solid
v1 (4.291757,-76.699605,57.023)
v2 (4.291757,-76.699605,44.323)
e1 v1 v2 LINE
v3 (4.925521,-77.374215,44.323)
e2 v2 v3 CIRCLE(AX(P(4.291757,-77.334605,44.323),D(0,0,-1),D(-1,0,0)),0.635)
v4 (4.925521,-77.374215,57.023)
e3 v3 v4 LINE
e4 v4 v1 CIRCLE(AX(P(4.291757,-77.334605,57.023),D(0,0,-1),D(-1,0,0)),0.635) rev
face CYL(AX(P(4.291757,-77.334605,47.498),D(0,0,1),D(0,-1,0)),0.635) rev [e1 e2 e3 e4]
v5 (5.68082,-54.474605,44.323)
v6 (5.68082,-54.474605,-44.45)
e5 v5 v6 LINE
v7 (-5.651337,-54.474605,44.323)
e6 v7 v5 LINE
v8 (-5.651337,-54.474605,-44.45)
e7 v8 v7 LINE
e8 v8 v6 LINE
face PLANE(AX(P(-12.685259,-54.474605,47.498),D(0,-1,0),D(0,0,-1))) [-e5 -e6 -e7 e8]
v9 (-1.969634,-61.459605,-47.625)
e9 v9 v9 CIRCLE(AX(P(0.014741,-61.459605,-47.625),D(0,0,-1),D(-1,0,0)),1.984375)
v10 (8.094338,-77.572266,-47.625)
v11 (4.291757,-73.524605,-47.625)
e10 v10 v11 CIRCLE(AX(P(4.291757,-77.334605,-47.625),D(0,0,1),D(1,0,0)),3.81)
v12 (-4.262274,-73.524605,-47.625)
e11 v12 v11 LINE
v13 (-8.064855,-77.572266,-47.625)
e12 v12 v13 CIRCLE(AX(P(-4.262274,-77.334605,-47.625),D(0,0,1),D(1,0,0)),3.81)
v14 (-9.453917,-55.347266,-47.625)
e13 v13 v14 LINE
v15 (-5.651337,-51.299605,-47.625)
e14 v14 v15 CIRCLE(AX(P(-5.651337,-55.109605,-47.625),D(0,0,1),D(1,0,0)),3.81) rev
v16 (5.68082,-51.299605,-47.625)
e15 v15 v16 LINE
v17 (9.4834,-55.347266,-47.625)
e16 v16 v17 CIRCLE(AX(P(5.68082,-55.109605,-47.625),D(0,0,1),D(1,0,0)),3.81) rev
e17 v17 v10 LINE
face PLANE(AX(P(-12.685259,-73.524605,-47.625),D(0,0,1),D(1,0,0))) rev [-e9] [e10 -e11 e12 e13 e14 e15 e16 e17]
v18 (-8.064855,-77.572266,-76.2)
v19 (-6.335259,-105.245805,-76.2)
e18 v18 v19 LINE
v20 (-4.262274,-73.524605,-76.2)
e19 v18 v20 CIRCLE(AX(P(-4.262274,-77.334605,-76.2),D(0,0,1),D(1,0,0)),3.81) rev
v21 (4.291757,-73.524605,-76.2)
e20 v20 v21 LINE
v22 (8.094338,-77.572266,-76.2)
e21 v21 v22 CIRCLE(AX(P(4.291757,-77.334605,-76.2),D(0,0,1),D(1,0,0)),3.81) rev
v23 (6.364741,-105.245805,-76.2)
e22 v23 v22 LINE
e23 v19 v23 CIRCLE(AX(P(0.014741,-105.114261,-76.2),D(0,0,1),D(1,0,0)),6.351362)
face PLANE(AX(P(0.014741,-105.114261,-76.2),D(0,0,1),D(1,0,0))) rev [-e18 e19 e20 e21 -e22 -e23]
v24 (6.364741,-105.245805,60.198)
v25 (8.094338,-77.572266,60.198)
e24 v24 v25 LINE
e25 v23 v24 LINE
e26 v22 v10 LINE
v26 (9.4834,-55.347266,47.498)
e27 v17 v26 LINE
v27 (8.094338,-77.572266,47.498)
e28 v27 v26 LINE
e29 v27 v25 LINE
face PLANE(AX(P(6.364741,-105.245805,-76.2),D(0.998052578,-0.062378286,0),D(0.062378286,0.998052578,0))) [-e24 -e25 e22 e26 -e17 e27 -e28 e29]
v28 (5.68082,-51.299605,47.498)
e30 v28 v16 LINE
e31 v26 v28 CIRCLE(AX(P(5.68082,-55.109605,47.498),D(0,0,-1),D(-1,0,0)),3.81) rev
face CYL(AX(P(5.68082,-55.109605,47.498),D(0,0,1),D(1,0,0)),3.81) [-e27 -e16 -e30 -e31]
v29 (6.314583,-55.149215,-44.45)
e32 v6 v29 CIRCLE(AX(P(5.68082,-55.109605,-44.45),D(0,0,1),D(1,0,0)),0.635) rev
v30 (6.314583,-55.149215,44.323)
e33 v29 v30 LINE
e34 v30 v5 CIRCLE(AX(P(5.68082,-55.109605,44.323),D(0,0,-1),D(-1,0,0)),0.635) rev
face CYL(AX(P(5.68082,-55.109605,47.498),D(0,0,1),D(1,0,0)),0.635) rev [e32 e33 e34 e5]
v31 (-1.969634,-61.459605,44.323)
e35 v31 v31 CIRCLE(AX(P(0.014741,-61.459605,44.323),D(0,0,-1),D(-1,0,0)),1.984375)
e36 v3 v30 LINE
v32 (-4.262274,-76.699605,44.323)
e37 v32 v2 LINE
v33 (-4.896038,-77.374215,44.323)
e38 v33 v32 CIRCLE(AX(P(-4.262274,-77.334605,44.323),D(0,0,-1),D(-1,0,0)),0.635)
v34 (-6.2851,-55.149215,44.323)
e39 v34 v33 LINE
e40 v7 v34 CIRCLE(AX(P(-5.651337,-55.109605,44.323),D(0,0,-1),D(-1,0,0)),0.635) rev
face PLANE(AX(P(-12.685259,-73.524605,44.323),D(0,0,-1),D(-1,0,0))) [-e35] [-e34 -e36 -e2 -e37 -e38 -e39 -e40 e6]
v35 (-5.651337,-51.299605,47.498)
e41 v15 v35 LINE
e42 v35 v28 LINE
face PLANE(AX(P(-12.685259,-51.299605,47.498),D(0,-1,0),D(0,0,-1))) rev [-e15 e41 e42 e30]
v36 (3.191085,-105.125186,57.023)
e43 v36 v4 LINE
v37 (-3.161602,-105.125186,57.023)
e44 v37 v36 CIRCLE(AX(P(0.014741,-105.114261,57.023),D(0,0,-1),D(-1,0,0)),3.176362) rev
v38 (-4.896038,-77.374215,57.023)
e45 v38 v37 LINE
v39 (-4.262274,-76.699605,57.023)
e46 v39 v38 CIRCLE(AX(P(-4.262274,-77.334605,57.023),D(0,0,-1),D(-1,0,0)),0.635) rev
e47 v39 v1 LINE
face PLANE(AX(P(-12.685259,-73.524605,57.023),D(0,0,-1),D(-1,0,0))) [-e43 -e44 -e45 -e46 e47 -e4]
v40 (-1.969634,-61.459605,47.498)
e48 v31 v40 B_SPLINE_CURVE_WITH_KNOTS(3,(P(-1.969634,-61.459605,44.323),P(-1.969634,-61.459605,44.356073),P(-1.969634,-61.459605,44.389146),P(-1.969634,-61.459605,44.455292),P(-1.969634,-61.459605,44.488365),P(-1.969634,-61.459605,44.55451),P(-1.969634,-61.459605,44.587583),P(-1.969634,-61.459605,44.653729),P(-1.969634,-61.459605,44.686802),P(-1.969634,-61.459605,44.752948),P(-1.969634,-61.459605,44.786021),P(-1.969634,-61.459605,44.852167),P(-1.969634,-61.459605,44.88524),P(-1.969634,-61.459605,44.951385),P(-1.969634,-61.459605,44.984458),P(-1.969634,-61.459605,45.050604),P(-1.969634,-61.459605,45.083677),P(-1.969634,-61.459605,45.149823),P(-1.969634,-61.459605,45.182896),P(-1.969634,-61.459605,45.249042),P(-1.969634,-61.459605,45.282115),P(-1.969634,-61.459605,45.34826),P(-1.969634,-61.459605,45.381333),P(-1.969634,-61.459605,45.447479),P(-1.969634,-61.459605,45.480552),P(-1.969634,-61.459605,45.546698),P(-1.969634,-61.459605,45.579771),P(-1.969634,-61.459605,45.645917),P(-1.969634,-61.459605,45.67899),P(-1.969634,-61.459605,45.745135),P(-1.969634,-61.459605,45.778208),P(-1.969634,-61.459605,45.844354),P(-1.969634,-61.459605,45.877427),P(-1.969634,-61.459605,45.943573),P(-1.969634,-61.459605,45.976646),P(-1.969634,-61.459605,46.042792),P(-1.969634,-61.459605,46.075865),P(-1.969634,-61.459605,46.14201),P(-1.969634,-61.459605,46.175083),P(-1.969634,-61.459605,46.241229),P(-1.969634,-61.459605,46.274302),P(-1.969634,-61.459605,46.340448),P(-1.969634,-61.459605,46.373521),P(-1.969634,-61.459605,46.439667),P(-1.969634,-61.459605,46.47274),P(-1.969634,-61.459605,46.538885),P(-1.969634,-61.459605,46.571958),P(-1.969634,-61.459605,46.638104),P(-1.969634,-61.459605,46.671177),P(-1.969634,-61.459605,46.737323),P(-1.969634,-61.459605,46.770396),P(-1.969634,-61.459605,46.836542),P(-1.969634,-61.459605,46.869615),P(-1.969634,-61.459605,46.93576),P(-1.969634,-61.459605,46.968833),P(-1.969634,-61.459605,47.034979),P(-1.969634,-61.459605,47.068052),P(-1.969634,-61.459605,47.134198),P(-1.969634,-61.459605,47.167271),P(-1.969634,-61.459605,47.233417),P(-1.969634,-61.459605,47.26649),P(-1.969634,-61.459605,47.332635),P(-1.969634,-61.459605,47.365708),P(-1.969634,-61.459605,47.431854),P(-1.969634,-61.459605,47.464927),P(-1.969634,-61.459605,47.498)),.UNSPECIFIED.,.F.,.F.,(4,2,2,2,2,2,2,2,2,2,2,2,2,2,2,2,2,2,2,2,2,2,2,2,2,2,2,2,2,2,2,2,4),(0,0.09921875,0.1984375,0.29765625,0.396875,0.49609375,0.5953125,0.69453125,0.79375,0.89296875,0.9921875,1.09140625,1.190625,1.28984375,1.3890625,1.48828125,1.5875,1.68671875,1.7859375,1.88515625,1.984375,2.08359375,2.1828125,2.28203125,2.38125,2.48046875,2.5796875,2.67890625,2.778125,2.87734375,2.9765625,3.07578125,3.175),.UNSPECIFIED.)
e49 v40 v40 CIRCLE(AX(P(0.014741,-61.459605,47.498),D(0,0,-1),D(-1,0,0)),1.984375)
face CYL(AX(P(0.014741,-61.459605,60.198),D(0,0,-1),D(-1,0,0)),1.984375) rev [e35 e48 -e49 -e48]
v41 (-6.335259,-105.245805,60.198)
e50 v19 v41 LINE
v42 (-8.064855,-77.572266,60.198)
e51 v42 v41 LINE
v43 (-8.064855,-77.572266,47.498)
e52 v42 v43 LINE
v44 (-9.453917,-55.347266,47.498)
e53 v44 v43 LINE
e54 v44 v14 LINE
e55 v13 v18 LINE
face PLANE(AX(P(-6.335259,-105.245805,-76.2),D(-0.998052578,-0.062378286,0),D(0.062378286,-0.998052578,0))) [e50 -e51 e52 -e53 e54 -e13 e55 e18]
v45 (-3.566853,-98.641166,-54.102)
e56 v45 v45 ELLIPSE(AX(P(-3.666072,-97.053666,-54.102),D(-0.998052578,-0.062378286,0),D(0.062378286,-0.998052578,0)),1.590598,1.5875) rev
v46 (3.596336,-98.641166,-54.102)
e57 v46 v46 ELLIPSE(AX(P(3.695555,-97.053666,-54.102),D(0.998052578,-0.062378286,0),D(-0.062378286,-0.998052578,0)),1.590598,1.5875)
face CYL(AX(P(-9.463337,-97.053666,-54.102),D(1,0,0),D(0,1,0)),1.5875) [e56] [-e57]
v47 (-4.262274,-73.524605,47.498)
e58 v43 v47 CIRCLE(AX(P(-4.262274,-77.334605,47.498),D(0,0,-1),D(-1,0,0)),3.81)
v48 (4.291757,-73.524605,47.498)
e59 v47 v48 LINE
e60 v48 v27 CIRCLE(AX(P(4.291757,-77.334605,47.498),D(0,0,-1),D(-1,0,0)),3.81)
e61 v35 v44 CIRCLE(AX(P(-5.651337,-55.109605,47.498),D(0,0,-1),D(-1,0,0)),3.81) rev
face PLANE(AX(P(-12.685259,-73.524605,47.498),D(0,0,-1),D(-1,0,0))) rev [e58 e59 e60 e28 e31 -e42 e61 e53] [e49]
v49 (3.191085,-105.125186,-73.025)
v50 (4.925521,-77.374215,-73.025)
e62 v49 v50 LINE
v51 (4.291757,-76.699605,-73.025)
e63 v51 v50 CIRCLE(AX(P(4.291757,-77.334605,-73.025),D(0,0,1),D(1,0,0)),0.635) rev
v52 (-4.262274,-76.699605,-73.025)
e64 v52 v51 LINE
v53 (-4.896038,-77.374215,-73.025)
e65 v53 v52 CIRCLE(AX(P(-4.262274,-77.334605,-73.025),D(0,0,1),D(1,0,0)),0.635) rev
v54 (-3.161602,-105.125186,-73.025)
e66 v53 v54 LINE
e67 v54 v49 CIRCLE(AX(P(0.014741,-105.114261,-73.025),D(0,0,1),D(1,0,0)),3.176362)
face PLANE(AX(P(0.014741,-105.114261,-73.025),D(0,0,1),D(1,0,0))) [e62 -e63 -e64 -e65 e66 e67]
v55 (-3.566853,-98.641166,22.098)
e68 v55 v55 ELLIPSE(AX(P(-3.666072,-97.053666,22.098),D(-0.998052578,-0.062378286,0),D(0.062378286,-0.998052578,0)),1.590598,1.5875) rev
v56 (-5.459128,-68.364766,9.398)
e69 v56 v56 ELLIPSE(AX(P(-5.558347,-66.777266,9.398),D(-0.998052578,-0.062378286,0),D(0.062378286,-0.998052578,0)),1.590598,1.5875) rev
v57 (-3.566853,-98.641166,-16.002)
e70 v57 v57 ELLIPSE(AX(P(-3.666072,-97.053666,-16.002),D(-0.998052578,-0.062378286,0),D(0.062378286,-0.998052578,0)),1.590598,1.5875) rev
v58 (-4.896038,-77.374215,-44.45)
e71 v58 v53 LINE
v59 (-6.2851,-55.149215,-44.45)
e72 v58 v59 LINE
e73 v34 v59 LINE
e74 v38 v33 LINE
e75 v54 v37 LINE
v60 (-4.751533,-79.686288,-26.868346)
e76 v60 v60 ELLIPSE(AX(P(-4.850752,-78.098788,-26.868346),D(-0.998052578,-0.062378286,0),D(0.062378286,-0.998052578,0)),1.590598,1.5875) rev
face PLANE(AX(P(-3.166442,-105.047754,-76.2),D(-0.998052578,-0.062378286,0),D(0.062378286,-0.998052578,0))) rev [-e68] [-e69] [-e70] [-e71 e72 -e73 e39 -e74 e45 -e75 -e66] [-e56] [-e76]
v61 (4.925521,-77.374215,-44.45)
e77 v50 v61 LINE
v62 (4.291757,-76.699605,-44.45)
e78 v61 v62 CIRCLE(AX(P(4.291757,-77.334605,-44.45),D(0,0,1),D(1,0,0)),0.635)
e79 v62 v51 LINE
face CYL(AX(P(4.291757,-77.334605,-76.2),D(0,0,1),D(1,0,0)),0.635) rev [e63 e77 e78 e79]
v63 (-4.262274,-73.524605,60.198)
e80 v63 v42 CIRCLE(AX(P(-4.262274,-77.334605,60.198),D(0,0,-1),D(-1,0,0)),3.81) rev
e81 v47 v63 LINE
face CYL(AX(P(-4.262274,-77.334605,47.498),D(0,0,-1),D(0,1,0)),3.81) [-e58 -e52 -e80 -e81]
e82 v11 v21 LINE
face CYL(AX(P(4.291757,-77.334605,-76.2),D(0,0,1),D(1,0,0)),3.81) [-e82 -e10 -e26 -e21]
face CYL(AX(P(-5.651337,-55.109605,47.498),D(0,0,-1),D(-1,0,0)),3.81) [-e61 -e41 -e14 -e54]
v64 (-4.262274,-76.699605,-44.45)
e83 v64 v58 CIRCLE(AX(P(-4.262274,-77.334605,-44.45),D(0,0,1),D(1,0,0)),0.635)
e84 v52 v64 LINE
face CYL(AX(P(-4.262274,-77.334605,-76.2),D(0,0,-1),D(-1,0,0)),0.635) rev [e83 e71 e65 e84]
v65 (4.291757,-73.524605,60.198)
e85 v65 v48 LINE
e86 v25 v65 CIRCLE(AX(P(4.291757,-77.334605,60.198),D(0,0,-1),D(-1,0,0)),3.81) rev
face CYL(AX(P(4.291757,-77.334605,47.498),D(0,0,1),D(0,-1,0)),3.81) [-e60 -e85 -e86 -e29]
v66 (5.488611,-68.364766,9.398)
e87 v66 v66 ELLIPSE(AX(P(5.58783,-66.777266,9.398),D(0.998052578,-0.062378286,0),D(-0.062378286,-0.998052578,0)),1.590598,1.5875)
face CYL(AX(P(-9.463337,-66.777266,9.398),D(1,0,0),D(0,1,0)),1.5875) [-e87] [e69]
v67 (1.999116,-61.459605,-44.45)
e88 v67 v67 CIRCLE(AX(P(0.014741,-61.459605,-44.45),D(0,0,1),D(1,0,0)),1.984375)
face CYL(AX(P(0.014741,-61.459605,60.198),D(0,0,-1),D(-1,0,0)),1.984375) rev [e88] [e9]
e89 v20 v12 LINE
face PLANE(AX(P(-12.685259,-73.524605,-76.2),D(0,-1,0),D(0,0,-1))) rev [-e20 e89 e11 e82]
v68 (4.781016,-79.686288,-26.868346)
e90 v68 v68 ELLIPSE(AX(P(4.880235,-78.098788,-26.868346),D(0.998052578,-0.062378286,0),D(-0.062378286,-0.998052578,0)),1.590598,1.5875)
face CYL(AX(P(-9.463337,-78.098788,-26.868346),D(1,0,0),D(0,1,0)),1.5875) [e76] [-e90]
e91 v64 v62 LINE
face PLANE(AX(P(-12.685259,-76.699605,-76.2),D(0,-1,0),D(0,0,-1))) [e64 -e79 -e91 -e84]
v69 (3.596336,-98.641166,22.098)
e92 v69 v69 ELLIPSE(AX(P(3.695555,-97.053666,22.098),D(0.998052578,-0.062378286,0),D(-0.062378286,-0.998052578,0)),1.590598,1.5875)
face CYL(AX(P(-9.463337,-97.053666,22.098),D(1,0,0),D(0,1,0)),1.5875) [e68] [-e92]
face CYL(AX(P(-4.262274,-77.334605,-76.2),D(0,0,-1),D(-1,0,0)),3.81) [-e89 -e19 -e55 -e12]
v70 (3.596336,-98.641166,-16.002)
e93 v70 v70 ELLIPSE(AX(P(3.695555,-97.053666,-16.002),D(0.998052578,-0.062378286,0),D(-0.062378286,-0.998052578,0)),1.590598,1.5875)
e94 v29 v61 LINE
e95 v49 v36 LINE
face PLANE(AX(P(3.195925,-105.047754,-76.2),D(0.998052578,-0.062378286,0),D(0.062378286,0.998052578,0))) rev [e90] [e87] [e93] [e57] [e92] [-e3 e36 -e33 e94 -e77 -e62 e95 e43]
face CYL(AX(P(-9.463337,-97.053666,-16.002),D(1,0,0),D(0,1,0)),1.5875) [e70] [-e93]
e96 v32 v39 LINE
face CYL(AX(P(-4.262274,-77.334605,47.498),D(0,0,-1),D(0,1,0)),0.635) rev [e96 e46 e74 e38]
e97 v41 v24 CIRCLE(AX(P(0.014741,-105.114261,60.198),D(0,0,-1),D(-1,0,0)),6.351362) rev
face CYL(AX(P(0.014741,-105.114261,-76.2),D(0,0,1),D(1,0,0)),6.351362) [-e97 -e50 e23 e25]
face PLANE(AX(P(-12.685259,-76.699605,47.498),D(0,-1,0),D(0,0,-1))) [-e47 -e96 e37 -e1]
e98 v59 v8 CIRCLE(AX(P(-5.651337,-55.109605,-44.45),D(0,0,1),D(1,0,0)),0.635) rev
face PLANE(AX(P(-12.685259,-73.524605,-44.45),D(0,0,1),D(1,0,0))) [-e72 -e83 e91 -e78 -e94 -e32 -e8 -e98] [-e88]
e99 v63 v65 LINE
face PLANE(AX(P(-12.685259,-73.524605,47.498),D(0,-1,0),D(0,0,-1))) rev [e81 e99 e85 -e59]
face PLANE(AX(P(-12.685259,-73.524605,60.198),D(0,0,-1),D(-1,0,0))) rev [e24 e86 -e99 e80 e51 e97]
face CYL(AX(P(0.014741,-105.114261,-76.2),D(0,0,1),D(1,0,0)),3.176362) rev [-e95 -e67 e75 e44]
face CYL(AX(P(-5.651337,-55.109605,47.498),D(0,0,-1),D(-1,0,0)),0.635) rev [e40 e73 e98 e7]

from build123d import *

# Parameters (mm, degrees)
BOSS_EXTRUDE1_DEPTH             = 76.2
BOSS_EXTRUDE1_DEPTH_BACK        = 76.2
CUT_EXTRUDE1_DEPTH              = 136.619651209
CUT_EXTRUDE1_DEPTH_BACK         = 136.619651209
FILLET1_R                       = 3.81
SHELL1_START                    = -44.45
SHELL1_DEPTH                    = 88.773
SHELL1_START_2                  = -73.025
SHELL1_2_DEPTH                  = 130.048
SKETCH14_R                      = 1.984375
CUT_EXTRUDE8_DEPTH              = 156.372005628
BOSS_EXTRUDE4_REACH             = 137.201
SKETCH15_R                      = 1.5875
BOSS_EXTRUDE4_DIRECTION_2_REACH = 137.201


# Read off the part's stored shape, not the designer's step: Shell1
with BuildPart() as part:
    # Sketch1 → Boss-Extrude1 (new, two sides: drawn at the far end of the back side and taken through both)
    with BuildSketch(Plane.XY.offset(-BOSS_EXTRUDE1_DEPTH_BACK)):
        with BuildLine():
            Line((-6.335258536, -105.245804705), (-12.685258536, -3.645804705))
            ThreePointArc((-12.685258536, -3.645804705), (0.014741464, 8.866413132), (12.714741464, -3.645804705))
            Line((12.714741464, -3.645804705), (6.364741464, -105.245804705))
            ThreePointArc((6.364741464, -105.245804705), (0.014741464, -111.465623147), (-6.335258536, -105.245804705))
        make_face()
    extrude(amount=BOSS_EXTRUDE1_DEPTH + BOSS_EXTRUDE1_DEPTH_BACK)

    # Sketch4 → Cut-Extrude1 (cut, two sides: drawn at the far end of the back side and taken through both)
    with BuildSketch(Plane(origin=(0, 0, 0), x_dir=(0, 0, -1), z_dir=(1, 0, 0)).offset(-CUT_EXTRUDE1_DEPTH_BACK)):
        Polygon((-47.498, -73.524605007), (-47.498, -51.299605007), (47.625, -51.299605007), (47.625, -73.524605007), (76.2, -73.524605007), (76.2, 8.866413132), (-76.2, 8.866413132), (-76.2, -28.682279346), (-76.2, -111.465623147), (-60.198, -111.465623147), (-60.198, -73.524605007), align=None)
    extrude(amount=CUT_EXTRUDE1_DEPTH + CUT_EXTRUDE1_DEPTH_BACK, mode=Mode.SUBTRACT)

    # Fillet1
    fillet1_edges = [part.edges().sort_by_distance(p)[0] for p in [
        (8.347316445, -73.524605007, 53.848),
        (9.736378945, -51.299605007, -0.0635),
        (-9.706896017, -51.299605007, -0.0635),
        (-8.317833517, -73.524605007, 53.848),
        (-8.317833517, -73.524605007, -61.9125),
        (8.347316445, -73.524605007, -61.9125),
    ]]
    fillet(fillet1_edges, radius=FILLET1_R)

    # Shell1 outline → Shell1 (cut)
    with BuildSketch(Plane.XY.offset(SHELL1_START)):
        with BuildLine():
            ThreePointArc((-3.161602106, -105.125185529), (0.014741465, -108.290623147), (3.191085035, -105.125185529))
            Line((3.191085035, -105.125185529), (6.314583179, -55.149215219))
            ThreePointArc((6.314583179, -55.149215219), (6.143625088, -54.674822007), (5.680819792, -54.474605007))
            Line((5.680819792, -54.474605007), (-5.651336863, -54.474605007))
            ThreePointArc((-5.651336863, -54.474605007), (-6.114142159, -54.674822006), (-6.285100251, -55.149215219))
            Line((-6.285100251, -55.149215219), (-3.161602106, -105.125185529))
        make_face()
    extrude(amount=SHELL1_DEPTH, mode=Mode.SUBTRACT)

    # Shell1 2 outline → Shell1 2 (cut)
    with BuildSketch(Plane.XY.offset(SHELL1_START_2)):
        with BuildLine():
            Line((-4.896037751, -77.374215219), (-3.161602106, -105.125185529))
            ThreePointArc((-3.161602106, -105.125185529), (0.014741465, -108.290623147), (3.191085035, -105.125185529))
            Line((3.191085035, -105.125185529), (4.925520679, -77.374215219))
            ThreePointArc((4.925520679, -77.374215219), (4.754562588, -76.899822007), (4.291757292, -76.699605007))
            Line((4.291757292, -76.699605007), (-4.262274363, -76.699605007))
            ThreePointArc((-4.262274363, -76.699605007), (-4.725079659, -76.899822006), (-4.896037751, -77.374215219))
        make_face()
    extrude(amount=SHELL1_2_DEPTH, mode=Mode.SUBTRACT)

    # Sketch14 → Cut-Extrude8 (cut, through all)
    with BuildSketch(Plane(origin=(0, 0, -47.625), x_dir=(-1, 0, 0), z_dir=(0, 0, -1))):
        with Locations((-0.014741464, -61.459605007)):
            Circle(SKETCH14_R)
    extrude(amount=-CUT_EXTRUDE8_DEPTH, mode=Mode.SUBTRACT)

    # Boss-Extrude4: up to this plane
    boss_extrude4_end = Plane(origin=(3.195924528, -105.047753647, -76.2), z_dir=(0.9980525784828886, -0.062378286155180485, 0))
    # Sketch15 → Boss-Extrude4 (add, up to the surface)
    with BuildSketch(Plane(origin=(3.191103822, -0.502900096, 0), x_dir=(0, 0, -1), z_dir=(1, 0, 0)), mode=Mode.PRIVATE) as boss_extrude4_sk1:
        with Locations(Location((-9.398, -66.274366182, 0), (0, 0, 270))):
            Circle(SKETCH15_R)
    boss_extrude4_tool1 = split(extrude(boss_extrude4_sk1.sketch, amount=BOSS_EXTRUDE4_REACH, mode=Mode.PRIVATE), bisect_by=boss_extrude4_end, keep=Keep.BOTH, mode=Mode.PRIVATE)
    add(boss_extrude4_tool1.solids().sort_by_distance((3.191104, -66.777266, 9.398))[0])
    # Sketch15 → Boss-Extrude4 (add, up to the surface)
    with BuildSketch(Plane(origin=(3.191103822, -0.502900096, 0), x_dir=(0, 0, -1), z_dir=(1, 0, 0)), mode=Mode.PRIVATE) as boss_extrude4_sk2:
        with Locations(Location((26.868345804, -77.595887652, 0), (0, 0, 270))):
            Circle(SKETCH15_R)
    boss_extrude4_tool2 = split(extrude(boss_extrude4_sk2.sketch, amount=BOSS_EXTRUDE4_REACH, mode=Mode.PRIVATE), bisect_by=boss_extrude4_end, keep=Keep.BOTH, mode=Mode.PRIVATE)
    add(boss_extrude4_tool2.solids().sort_by_distance((3.191104, -78.098788, -26.868346))[0])
    # Sketch15 → Boss-Extrude4 (add, up to the surface)
    with BuildSketch(Plane(origin=(3.191103822, -0.502900096, 0), x_dir=(0, 0, -1), z_dir=(1, 0, 0)), mode=Mode.PRIVATE) as boss_extrude4_sk3:
        with Locations(Location((-22.098, -96.55076585, 0), (0, 0, 270))):
            Circle(SKETCH15_R)
    boss_extrude4_tool3 = split(extrude(boss_extrude4_sk3.sketch, amount=BOSS_EXTRUDE4_REACH, mode=Mode.PRIVATE), bisect_by=boss_extrude4_end, keep=Keep.BOTH, mode=Mode.PRIVATE)
    add(boss_extrude4_tool3.solids().sort_by_distance((3.191104, -97.053666, 22.098))[0])
    # Sketch15 → Boss-Extrude4 (add, up to the surface)
    with BuildSketch(Plane(origin=(3.191103822, -0.502900096, 0), x_dir=(0, 0, -1), z_dir=(1, 0, 0)), mode=Mode.PRIVATE) as boss_extrude4_sk4:
        with Locations(Location((16.002, -96.55076585, 0), (0, 0, 270))):
            Circle(SKETCH15_R)
    boss_extrude4_tool4 = split(extrude(boss_extrude4_sk4.sketch, amount=BOSS_EXTRUDE4_REACH, mode=Mode.PRIVATE), bisect_by=boss_extrude4_end, keep=Keep.BOTH, mode=Mode.PRIVATE)
    add(boss_extrude4_tool4.solids().sort_by_distance((3.191104, -97.053666, -16.002))[0])
    # Sketch15 → Boss-Extrude4 (add, up to the surface)
    with BuildSketch(Plane(origin=(3.191103822, -0.502900096, 0), x_dir=(0, 0, -1), z_dir=(1, 0, 0)), mode=Mode.PRIVATE) as boss_extrude4_sk5:
        with Locations(Location((54.102, -96.55076585, 0), (0, 0, 270))):
            Circle(SKETCH15_R)
    boss_extrude4_tool5 = split(extrude(boss_extrude4_sk5.sketch, amount=BOSS_EXTRUDE4_REACH, mode=Mode.PRIVATE), bisect_by=boss_extrude4_end, keep=Keep.BOTH, mode=Mode.PRIVATE)
    add(boss_extrude4_tool5.solids().sort_by_distance((3.191104, -97.053666, -54.102))[0])

    # Boss-Extrude4 direction 2: up to this plane
    boss_extrude4_direction_2_end = Plane(origin=(-3.166441599, -105.047753647, -76.2), z_dir=(-0.9980525784828886, -0.0623782861551806, 0))
    # Sketch15 → Boss-Extrude4 direction 2 (add, up to the surface)
    with BuildSketch(Plane(origin=(3.191103822, -0.502900096, 0), x_dir=(0, 0, -1), z_dir=(1, 0, 0)), mode=Mode.PRIVATE) as boss_extrude4_direction_2_sk1:
        with Locations(Location((-9.398, -66.274366182, 0), (0, 0, 270))):
            Circle(SKETCH15_R)
    boss_extrude4_direction_2_tool1 = split(extrude(boss_extrude4_direction_2_sk1.sketch, amount=-BOSS_EXTRUDE4_DIRECTION_2_REACH, mode=Mode.PRIVATE), bisect_by=boss_extrude4_direction_2_end, keep=Keep.BOTH, mode=Mode.PRIVATE)
    add(boss_extrude4_direction_2_tool1.solids().sort_by_distance((3.191104, -66.777266, 9.398))[0])
    # Sketch15 → Boss-Extrude4 direction 2 (add, up to the surface)
    with BuildSketch(Plane(origin=(3.191103822, -0.502900096, 0), x_dir=(0, 0, -1), z_dir=(1, 0, 0)), mode=Mode.PRIVATE) as boss_extrude4_direction_2_sk2:
        with Locations(Location((26.868345804, -77.595887652, 0), (0, 0, 270))):
            Circle(SKETCH15_R)
    boss_extrude4_direction_2_tool2 = split(extrude(boss_extrude4_direction_2_sk2.sketch, amount=-BOSS_EXTRUDE4_DIRECTION_2_REACH, mode=Mode.PRIVATE), bisect_by=boss_extrude4_direction_2_end, keep=Keep.BOTH, mode=Mode.PRIVATE)
    add(boss_extrude4_direction_2_tool2.solids().sort_by_distance((3.191104, -78.098788, -26.868346))[0])
    # Sketch15 → Boss-Extrude4 direction 2 (add, up to the surface)
    with BuildSketch(Plane(origin=(3.191103822, -0.502900096, 0), x_dir=(0, 0, -1), z_dir=(1, 0, 0)), mode=Mode.PRIVATE) as boss_extrude4_direction_2_sk3:
        with Locations(Location((-22.098, -96.55076585, 0), (0, 0, 270))):
            Circle(SKETCH15_R)
    boss_extrude4_direction_2_tool3 = split(extrude(boss_extrude4_direction_2_sk3.sketch, amount=-BOSS_EXTRUDE4_DIRECTION_2_REACH, mode=Mode.PRIVATE), bisect_by=boss_extrude4_direction_2_end, keep=Keep.BOTH, mode=Mode.PRIVATE)
    add(boss_extrude4_direction_2_tool3.solids().sort_by_distance((3.191104, -97.053666, 22.098))[0])
    # Sketch15 → Boss-Extrude4 direction 2 (add, up to the surface)
    with BuildSketch(Plane(origin=(3.191103822, -0.502900096, 0), x_dir=(0, 0, -1), z_dir=(1, 0, 0)), mode=Mode.PRIVATE) as boss_extrude4_direction_2_sk4:
        with Locations(Location((16.002, -96.55076585, 0), (0, 0, 270))):
            Circle(SKETCH15_R)
    boss_extrude4_direction_2_tool4 = split(extrude(boss_extrude4_direction_2_sk4.sketch, amount=-BOSS_EXTRUDE4_DIRECTION_2_REACH, mode=Mode.PRIVATE), bisect_by=boss_extrude4_direction_2_end, keep=Keep.BOTH, mode=Mode.PRIVATE)
    add(boss_extrude4_direction_2_tool4.solids().sort_by_distance((3.191104, -97.053666, -16.002))[0])
    # Sketch15 → Boss-Extrude4 direction 2 (add, up to the surface)
    with BuildSketch(Plane(origin=(3.191103822, -0.502900096, 0), x_dir=(0, 0, -1), z_dir=(1, 0, 0)), mode=Mode.PRIVATE) as boss_extrude4_direction_2_sk5:
        with Locations(Location((54.102, -96.55076585, 0), (0, 0, 270))):
            Circle(SKETCH15_R)
    boss_extrude4_direction_2_tool5 = split(extrude(boss_extrude4_direction_2_sk5.sketch, amount=-BOSS_EXTRUDE4_DIRECTION_2_REACH, mode=Mode.PRIVATE), bisect_by=boss_extrude4_direction_2_end, keep=Keep.BOTH, mode=Mode.PRIVATE)
    add(boss_extrude4_direction_2_tool5.solids().sort_by_distance((3.191104, -97.053666, -54.102))[0])


solid = part.part
